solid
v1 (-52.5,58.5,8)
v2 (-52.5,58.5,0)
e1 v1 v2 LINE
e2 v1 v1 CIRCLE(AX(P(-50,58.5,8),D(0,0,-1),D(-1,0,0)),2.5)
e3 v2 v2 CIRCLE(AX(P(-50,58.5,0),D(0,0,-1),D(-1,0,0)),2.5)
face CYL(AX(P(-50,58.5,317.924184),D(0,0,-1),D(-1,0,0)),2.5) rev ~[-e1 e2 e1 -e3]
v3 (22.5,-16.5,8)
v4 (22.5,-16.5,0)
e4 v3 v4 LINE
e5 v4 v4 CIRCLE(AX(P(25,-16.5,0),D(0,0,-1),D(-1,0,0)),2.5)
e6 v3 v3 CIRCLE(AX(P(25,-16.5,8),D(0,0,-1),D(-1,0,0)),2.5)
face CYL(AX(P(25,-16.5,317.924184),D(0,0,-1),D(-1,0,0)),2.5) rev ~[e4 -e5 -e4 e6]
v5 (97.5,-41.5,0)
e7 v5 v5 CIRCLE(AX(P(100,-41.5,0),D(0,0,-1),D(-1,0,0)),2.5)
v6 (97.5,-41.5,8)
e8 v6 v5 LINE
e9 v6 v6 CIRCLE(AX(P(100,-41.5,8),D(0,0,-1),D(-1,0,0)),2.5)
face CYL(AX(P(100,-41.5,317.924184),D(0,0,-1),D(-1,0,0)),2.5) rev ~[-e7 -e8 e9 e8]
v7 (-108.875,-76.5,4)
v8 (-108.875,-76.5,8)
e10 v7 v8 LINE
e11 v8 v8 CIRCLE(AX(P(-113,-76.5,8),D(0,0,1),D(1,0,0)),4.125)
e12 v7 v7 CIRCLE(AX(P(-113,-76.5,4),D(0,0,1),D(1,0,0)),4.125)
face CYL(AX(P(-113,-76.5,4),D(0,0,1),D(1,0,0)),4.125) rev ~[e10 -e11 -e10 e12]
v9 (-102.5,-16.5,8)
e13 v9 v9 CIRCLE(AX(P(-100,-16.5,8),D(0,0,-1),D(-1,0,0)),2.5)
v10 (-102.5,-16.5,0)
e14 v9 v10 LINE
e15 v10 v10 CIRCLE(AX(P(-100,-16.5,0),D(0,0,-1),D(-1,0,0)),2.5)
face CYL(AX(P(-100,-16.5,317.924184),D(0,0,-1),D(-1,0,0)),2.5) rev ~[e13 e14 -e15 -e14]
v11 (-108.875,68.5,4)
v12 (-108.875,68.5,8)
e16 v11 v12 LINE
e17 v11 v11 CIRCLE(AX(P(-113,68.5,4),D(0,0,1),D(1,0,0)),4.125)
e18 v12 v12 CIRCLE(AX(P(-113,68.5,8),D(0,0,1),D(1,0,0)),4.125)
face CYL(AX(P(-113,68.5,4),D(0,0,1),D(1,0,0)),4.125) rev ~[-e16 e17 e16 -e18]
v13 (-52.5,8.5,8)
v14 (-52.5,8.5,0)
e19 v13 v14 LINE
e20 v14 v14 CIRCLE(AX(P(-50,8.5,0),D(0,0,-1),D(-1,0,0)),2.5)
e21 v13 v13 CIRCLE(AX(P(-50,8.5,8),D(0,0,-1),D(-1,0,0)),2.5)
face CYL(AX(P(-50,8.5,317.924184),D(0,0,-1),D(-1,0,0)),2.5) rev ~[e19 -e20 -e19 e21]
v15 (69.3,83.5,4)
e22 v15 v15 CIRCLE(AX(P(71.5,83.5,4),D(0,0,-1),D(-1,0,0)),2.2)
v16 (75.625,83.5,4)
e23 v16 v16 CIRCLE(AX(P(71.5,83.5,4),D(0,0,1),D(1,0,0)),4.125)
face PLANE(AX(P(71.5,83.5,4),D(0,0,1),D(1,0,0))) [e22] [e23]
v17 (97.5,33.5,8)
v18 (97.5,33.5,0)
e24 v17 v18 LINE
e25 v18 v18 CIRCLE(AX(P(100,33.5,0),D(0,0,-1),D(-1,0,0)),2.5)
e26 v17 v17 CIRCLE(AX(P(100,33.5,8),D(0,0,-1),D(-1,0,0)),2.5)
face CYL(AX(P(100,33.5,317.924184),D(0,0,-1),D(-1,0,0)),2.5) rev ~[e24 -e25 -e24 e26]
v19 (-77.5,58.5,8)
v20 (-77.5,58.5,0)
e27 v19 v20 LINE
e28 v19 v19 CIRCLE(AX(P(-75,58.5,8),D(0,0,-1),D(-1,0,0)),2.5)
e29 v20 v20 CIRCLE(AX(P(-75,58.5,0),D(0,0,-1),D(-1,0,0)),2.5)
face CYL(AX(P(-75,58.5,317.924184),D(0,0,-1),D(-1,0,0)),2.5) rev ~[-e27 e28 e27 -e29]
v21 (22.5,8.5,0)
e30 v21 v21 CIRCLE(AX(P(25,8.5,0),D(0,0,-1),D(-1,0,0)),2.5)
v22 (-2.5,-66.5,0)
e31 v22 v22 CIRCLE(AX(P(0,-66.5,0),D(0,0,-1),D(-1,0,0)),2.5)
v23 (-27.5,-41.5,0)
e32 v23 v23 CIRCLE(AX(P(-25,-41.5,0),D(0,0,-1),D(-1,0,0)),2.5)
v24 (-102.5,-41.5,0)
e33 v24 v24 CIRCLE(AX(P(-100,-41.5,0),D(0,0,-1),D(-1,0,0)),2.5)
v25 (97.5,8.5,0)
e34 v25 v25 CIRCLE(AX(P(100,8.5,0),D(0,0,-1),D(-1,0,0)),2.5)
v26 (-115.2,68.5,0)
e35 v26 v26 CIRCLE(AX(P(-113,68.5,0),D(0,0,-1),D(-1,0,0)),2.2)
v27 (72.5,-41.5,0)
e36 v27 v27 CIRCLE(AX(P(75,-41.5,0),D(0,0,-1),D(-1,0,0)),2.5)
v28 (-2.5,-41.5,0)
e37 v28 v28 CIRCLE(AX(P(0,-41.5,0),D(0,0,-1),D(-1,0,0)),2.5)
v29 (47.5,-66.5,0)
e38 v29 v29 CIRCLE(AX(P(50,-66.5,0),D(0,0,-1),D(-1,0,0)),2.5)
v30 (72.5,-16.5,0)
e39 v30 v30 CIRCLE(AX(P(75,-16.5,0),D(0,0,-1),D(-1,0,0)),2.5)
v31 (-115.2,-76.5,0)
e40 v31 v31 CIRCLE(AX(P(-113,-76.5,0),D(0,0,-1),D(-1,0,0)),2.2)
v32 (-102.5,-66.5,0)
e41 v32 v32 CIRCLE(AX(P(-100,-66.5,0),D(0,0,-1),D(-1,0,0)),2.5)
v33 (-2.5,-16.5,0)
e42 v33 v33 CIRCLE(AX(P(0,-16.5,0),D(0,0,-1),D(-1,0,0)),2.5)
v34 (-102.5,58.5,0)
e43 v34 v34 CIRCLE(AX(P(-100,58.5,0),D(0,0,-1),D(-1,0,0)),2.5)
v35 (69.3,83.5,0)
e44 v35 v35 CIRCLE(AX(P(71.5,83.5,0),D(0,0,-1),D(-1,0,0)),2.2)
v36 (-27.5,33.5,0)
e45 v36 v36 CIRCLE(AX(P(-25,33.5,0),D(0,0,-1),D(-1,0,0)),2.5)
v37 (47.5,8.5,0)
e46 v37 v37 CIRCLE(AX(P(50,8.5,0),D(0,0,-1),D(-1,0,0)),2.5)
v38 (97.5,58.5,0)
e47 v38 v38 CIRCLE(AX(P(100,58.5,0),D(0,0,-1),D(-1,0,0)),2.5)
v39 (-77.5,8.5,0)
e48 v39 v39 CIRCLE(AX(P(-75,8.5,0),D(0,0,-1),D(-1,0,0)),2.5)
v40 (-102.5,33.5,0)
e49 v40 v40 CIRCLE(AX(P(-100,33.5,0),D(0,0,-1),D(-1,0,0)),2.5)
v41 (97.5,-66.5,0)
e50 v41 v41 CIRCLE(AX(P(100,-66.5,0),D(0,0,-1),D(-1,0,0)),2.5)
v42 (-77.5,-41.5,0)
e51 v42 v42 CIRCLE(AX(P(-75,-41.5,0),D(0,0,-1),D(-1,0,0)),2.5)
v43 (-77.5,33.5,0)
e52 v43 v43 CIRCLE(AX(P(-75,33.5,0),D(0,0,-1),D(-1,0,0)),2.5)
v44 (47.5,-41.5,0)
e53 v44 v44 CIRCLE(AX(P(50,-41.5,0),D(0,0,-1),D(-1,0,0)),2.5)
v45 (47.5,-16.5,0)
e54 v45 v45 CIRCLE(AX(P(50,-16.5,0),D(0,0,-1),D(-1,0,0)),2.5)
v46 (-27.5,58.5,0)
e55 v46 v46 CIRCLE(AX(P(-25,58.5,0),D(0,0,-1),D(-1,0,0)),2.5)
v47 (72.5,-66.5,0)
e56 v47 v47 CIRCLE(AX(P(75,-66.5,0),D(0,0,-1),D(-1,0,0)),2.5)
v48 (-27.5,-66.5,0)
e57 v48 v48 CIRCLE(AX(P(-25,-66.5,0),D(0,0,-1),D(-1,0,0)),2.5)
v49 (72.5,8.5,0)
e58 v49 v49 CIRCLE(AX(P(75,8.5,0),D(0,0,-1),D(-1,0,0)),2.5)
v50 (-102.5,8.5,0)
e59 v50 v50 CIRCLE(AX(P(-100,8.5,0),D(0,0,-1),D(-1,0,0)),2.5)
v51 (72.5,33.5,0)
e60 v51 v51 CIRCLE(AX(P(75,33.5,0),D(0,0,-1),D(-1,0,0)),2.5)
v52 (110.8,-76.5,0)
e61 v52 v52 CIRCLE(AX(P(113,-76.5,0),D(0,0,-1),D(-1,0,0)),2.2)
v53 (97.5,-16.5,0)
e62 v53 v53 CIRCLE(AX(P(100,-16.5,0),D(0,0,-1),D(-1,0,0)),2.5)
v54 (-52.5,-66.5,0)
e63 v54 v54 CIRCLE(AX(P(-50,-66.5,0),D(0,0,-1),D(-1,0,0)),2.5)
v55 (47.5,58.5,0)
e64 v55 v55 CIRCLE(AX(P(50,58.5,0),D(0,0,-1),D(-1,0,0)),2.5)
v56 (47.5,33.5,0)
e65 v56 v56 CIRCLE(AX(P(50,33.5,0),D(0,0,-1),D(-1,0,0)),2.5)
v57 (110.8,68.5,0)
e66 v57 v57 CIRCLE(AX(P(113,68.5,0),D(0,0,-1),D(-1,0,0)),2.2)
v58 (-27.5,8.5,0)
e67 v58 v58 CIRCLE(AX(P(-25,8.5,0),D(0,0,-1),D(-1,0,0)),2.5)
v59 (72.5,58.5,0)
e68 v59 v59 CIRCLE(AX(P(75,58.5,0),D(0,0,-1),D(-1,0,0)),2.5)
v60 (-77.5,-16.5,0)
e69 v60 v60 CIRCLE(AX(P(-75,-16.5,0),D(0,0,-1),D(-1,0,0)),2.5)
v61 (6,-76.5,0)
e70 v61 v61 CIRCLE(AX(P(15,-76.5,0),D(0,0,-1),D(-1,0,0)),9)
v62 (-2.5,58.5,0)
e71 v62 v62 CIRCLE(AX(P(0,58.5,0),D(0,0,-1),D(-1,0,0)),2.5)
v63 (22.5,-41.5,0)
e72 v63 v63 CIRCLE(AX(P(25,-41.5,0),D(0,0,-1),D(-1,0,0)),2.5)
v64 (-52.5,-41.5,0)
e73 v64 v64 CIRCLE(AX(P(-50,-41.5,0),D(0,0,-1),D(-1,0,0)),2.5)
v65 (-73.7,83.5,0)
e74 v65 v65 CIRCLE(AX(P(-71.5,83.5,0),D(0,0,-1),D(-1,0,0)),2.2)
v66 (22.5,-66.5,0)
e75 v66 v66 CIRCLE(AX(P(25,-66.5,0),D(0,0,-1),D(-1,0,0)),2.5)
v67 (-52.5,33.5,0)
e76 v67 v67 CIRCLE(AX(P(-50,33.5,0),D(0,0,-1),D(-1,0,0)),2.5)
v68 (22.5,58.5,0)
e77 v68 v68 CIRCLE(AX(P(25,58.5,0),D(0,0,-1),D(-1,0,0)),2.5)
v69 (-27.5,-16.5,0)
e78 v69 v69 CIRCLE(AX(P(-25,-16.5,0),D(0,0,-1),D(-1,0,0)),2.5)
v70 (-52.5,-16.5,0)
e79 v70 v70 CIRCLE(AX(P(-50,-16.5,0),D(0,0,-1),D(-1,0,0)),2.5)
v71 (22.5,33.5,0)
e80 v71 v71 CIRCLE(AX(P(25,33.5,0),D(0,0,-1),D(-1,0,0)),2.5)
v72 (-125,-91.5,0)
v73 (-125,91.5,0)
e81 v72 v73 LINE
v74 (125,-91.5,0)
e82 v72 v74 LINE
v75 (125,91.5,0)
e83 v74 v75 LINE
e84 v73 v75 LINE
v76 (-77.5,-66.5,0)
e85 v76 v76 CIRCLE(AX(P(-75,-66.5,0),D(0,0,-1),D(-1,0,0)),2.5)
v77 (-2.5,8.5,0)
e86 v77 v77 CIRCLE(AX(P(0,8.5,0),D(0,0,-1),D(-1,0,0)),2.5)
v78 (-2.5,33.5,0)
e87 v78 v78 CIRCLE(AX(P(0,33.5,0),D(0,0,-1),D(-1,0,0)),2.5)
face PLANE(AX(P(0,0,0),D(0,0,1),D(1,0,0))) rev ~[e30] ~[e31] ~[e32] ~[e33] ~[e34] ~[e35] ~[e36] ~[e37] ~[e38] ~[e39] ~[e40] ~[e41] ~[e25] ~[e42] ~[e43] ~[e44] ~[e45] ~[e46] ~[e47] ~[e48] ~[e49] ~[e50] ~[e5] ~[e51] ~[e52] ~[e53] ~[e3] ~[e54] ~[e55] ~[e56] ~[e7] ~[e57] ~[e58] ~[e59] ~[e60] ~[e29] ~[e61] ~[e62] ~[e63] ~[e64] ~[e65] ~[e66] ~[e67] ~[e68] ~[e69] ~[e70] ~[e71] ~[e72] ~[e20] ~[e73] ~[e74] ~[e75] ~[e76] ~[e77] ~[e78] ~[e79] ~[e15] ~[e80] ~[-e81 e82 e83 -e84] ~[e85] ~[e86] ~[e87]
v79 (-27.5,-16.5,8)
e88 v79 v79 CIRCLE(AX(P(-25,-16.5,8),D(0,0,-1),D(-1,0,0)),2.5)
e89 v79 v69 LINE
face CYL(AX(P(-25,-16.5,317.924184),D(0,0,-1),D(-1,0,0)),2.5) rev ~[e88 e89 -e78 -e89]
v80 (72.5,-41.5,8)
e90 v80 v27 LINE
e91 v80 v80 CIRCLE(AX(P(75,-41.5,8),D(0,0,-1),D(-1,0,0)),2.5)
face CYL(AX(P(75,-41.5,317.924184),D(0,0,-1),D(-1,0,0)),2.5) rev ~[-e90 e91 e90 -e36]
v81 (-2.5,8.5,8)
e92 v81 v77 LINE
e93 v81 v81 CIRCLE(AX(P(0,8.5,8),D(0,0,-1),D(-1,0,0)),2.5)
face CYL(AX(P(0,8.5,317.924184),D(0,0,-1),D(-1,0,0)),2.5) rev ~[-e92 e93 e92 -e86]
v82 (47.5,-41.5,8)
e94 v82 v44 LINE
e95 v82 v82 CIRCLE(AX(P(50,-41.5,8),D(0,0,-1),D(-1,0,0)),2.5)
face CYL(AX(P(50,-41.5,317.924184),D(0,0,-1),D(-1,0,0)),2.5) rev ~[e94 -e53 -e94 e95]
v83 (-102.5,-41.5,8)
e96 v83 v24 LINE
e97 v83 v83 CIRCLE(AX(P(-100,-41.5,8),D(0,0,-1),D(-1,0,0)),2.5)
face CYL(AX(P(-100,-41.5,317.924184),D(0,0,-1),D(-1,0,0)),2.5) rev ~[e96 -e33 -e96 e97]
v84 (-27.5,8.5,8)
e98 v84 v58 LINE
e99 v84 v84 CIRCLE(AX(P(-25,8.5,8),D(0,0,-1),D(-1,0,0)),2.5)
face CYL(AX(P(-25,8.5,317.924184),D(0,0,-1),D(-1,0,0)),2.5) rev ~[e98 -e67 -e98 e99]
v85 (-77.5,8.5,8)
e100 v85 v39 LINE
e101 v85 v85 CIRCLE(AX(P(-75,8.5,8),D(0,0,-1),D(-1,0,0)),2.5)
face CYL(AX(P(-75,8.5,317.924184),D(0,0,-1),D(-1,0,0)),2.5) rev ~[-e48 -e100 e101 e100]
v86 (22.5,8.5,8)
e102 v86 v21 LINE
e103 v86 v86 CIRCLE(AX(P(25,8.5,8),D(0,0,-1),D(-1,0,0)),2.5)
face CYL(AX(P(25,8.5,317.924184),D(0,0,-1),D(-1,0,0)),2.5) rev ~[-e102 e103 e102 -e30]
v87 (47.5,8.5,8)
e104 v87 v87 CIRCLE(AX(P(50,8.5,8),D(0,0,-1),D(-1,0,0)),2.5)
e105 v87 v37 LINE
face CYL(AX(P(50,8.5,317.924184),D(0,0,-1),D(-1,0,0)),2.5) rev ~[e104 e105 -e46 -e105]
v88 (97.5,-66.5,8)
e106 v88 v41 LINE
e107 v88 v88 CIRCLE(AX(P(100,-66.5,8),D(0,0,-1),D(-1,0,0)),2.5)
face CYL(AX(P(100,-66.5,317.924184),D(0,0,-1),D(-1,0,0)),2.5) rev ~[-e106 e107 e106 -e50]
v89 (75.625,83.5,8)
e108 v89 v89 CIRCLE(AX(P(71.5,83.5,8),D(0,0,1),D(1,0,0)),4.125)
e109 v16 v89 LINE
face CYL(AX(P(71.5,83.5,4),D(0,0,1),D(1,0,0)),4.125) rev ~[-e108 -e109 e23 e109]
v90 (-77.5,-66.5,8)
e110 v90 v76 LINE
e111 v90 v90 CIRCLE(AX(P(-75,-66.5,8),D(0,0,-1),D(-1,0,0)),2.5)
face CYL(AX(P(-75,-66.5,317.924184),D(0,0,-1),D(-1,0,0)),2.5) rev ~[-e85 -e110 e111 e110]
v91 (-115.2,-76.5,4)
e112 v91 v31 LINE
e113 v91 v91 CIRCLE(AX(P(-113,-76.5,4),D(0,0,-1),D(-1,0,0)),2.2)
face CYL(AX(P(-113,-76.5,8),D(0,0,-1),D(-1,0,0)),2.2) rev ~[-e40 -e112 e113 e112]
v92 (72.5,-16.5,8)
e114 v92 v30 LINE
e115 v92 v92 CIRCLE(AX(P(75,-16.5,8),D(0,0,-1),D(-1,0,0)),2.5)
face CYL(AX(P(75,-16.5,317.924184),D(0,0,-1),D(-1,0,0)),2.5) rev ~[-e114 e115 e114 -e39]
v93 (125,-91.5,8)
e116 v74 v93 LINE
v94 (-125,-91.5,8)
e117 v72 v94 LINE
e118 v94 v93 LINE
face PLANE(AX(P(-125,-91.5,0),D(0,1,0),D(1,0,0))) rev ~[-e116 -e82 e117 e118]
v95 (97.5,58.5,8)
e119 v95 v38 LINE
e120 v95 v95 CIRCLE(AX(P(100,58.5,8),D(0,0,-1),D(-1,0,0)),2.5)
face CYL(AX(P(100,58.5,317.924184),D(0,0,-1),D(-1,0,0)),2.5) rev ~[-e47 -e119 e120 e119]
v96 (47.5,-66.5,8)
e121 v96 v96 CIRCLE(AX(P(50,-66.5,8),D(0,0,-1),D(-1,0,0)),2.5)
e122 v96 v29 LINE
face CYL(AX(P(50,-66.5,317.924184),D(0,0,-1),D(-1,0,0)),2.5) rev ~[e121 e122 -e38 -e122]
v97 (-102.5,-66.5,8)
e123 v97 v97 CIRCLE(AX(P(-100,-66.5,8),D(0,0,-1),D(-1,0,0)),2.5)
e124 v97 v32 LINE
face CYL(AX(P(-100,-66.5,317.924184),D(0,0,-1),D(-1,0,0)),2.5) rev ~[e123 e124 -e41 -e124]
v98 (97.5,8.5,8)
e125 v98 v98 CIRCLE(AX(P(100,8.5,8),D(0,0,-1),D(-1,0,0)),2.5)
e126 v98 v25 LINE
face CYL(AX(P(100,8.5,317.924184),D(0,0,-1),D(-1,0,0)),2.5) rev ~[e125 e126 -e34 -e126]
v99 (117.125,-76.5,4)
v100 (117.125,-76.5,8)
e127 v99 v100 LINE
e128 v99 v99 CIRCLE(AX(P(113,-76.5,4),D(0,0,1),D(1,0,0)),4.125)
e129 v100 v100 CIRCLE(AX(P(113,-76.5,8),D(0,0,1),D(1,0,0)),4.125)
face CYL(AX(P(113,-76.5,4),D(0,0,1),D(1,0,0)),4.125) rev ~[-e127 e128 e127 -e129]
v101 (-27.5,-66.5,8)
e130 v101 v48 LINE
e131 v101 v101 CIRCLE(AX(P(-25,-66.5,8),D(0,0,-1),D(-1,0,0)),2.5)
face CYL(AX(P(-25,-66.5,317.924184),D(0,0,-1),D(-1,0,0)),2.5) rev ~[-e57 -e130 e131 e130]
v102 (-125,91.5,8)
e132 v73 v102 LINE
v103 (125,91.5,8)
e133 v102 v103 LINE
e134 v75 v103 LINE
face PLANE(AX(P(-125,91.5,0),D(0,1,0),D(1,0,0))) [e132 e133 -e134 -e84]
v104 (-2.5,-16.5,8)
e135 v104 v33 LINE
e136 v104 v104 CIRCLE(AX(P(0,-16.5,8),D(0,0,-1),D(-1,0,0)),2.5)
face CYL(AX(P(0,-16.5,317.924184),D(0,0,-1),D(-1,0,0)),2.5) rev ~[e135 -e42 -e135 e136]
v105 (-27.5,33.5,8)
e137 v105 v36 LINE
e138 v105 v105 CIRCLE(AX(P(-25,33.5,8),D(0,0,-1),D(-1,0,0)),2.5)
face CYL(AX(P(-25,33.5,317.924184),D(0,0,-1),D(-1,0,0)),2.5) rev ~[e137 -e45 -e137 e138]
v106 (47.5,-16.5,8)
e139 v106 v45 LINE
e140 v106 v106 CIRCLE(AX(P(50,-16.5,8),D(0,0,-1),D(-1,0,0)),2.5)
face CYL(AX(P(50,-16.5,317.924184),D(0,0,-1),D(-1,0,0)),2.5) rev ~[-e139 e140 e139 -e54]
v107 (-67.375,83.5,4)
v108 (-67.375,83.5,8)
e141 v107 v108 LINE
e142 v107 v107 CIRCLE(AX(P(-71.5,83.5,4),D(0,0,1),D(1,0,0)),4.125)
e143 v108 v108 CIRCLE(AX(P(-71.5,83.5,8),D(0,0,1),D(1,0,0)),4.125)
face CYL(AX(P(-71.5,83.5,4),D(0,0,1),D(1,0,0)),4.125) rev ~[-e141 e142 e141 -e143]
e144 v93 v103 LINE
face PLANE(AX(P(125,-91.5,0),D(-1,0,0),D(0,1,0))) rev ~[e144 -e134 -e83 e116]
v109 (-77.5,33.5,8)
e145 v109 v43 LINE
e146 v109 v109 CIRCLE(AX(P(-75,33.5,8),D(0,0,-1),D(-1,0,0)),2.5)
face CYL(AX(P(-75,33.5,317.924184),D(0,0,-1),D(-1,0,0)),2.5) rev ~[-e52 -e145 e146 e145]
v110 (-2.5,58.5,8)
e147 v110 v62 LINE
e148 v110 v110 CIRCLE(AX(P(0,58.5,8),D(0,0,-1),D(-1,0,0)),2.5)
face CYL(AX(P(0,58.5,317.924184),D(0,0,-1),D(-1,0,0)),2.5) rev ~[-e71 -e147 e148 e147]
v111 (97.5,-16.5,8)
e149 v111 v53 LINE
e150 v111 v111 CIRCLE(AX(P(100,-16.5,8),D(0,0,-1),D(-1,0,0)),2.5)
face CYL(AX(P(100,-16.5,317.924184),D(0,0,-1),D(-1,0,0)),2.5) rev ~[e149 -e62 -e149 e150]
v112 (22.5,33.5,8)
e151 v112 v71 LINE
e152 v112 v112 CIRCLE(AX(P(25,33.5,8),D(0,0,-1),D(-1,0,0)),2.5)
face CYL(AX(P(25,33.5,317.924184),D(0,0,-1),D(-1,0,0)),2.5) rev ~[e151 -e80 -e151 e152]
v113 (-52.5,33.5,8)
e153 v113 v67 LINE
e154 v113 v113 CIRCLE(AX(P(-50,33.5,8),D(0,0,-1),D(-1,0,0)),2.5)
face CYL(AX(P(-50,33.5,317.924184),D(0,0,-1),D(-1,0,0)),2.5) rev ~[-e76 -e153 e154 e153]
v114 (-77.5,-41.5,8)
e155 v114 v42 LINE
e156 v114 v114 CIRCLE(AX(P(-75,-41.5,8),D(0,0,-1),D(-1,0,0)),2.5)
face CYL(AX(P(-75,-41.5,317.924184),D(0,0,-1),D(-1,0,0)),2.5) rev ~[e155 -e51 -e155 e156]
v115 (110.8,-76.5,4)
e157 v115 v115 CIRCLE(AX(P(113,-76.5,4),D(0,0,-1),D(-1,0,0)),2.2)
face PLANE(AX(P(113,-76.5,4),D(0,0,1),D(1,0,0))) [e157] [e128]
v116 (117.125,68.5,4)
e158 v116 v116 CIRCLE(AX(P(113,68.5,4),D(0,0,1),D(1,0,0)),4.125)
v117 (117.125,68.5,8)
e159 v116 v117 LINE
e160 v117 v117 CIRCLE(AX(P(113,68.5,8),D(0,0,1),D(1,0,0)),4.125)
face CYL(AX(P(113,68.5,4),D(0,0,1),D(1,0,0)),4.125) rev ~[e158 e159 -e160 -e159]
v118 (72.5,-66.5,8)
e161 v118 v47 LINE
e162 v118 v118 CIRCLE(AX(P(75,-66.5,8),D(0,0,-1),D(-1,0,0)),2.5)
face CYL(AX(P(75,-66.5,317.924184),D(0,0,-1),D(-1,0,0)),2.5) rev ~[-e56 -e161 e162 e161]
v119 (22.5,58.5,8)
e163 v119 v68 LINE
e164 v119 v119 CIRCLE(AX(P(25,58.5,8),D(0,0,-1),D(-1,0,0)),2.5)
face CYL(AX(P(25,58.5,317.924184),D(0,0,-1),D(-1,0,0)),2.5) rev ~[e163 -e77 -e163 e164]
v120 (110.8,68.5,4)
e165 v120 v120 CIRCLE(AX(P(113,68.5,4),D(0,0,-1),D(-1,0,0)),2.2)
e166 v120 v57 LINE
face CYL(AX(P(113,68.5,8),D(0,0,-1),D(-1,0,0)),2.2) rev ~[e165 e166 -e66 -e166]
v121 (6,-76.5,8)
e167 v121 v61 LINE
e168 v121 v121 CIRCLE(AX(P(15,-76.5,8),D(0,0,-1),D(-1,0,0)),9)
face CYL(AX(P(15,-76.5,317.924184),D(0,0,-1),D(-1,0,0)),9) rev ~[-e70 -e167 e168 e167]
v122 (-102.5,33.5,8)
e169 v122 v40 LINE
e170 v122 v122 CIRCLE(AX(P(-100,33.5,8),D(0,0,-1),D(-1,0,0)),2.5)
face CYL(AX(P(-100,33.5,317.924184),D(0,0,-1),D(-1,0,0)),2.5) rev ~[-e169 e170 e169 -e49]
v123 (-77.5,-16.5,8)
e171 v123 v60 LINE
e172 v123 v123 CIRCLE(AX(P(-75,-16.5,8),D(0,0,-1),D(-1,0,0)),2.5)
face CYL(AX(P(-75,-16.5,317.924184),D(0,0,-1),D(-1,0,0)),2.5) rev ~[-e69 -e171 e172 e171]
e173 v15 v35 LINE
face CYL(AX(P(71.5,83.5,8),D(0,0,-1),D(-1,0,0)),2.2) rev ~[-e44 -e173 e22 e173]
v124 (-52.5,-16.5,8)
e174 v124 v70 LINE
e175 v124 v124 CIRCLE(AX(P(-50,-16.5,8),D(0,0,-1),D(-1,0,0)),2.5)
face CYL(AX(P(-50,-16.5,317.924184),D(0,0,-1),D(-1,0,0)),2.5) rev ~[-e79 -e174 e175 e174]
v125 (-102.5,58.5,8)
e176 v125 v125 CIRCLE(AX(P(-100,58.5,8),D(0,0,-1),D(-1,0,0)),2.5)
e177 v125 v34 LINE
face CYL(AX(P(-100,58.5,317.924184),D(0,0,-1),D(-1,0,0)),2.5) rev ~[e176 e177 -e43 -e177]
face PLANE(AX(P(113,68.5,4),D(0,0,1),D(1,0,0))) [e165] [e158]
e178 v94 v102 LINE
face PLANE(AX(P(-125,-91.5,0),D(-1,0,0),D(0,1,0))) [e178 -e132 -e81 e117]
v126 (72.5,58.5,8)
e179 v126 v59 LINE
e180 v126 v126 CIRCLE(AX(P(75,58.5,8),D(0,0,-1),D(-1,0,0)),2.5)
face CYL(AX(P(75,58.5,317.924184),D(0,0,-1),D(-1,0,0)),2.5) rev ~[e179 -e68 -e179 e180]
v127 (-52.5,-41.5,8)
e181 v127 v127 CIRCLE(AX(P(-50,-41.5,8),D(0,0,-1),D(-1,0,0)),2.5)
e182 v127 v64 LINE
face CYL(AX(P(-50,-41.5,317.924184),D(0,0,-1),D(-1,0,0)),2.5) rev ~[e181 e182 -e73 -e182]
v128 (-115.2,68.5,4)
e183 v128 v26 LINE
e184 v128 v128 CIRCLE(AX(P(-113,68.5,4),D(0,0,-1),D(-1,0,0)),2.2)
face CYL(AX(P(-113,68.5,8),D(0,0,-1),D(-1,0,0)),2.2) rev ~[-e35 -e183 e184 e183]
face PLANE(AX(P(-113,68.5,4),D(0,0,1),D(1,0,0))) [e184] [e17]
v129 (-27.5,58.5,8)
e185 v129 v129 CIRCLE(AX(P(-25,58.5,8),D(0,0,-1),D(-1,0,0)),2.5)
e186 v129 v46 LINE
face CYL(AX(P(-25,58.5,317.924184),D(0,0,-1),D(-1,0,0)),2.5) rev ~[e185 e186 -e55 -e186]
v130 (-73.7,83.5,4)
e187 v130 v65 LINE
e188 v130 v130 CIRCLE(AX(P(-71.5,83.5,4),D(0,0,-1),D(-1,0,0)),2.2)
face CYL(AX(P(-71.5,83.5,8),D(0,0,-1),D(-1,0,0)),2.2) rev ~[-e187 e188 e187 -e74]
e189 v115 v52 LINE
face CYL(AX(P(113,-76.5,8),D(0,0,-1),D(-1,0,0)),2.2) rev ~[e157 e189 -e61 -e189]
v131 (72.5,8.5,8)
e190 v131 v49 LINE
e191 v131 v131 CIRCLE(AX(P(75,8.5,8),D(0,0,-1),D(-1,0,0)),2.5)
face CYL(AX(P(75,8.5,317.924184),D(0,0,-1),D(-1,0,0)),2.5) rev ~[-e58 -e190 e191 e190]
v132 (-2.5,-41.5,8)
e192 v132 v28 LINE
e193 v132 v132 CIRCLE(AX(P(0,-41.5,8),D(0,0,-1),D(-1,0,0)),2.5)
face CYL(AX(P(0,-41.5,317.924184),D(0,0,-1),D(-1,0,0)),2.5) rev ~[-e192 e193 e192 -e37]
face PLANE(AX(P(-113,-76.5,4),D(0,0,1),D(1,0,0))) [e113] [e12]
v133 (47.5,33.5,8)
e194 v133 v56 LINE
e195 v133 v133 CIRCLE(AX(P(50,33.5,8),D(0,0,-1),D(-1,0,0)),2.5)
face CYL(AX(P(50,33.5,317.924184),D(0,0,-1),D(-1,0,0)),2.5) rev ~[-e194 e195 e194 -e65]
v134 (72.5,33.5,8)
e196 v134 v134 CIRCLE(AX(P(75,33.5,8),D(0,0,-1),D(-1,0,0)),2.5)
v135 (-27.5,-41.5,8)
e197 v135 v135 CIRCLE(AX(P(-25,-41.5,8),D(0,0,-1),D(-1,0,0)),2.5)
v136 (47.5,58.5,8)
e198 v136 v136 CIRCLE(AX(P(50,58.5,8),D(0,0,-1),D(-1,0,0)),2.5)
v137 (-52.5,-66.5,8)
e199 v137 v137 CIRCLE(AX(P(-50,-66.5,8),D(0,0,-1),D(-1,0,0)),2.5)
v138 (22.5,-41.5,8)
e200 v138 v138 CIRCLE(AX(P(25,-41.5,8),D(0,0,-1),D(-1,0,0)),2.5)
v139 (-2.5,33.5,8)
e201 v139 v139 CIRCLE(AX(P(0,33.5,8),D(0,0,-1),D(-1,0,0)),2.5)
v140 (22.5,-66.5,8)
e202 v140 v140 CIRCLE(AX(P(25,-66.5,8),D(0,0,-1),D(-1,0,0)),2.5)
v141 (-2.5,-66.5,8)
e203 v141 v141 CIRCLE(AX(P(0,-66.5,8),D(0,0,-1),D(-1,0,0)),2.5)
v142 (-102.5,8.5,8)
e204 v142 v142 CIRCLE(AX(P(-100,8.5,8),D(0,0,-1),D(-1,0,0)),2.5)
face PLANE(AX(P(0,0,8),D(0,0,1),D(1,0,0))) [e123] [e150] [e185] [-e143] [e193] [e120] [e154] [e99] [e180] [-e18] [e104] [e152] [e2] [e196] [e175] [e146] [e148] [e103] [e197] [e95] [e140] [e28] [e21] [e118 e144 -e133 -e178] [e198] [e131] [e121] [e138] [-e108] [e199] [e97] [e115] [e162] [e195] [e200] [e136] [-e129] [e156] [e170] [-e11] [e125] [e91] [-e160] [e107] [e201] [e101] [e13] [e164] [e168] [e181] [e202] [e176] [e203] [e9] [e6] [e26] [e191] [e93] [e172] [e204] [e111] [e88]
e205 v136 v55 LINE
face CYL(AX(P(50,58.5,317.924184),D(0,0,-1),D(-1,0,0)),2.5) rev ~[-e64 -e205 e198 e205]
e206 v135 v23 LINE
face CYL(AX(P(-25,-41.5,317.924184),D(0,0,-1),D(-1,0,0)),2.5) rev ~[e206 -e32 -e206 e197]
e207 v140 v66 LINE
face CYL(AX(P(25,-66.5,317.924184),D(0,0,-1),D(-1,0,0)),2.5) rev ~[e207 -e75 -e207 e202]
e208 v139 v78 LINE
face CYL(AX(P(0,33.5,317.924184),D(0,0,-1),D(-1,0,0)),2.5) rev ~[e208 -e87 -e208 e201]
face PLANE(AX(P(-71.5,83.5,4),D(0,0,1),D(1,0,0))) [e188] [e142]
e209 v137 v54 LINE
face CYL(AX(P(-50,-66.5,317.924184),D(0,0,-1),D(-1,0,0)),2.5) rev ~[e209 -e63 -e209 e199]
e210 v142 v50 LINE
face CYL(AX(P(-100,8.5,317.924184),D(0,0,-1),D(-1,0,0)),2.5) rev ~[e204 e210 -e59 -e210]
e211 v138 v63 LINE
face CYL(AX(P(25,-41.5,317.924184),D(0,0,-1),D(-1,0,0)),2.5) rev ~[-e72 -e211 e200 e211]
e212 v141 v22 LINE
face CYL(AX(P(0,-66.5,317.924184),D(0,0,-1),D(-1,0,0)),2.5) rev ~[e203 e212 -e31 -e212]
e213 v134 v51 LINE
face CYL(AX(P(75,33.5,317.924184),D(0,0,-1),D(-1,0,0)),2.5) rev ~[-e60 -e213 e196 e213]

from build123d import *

# Parameters (mm, degrees)
F0_W           = 250
F0_H           = 183
F1_DEPTH       = 8
F3_D           = 4.4
F3_CBORE_D     = 8.25
F3_CBORE_DEPTH = 4
F4_D           = 18
F5_D           = 5


# Not quite as in the source:
# - a feature names something its author has since deleted; it is built from what else it names


with BuildPart() as f1:
    # F0 (on Top) → F1 (new body)
    with BuildSketch(Plane.XY):
        Rectangle(F0_W, F0_H)
    extrude(amount=F1_DEPTH)

    # F3 (through all)
    with Locations(Plane.XY.offset(8)):
        with Locations((-113, 68.5), (-113, -76.5), (113, -76.5), (113, 68.5), (71.5, 83.5), (-71.5, 83.5)):
            CounterBoreHole(F3_D / 2, F3_CBORE_D / 2, F3_CBORE_DEPTH)

    # F4 (through all)
    with Locations(Plane.XY.offset(8)):
        with Locations((15, -76.5)):
            Hole(F4_D / 2)

    # F5 (through all)
    with Locations(Plane.XY.offset(8)):
        with Locations((100, 58.5), (100, 33.5), (100, 8.5), (100, -16.5), (100, -41.5), (100, -66.5), (75, -66.5), (75, -41.5), (75, -16.5), (75, 8.5), (75, 33.5), (75, 58.5), (50, 58.5), (50, 33.5), (50, 8.5), (50, -16.5), (50, -41.5), (50, -66.5), (25, -66.5), (0, -66.5), (-25, -66.5), (-50, -66.5), (-75, -66.5), (-100, -66.5), (-100, -41.5), (-75, -41.5), (-50, -41.5), (-25, -41.5), (0, -41.5), (25, -41.5), (25, -16.5), (0, -16.5), (-25, -16.5), (-50, -16.5), (-75, -16.5), (-100, -16.5), (-100, 8.5), (-75, 8.5), (-50, 8.5), (-25, 8.5), (0, 8.5), (25, 8.5), (25, 33.5), (0, 33.5), (-25, 33.5), (-50, 33.5), (-75, 33.5), (-100, 33.5), (-100, 58.5), (-75, 58.5), (-50, 58.5), (25, 58.5), (-25, 58.5), (0, 58.5)):
            Hole(F5_D / 2)


solid = f1.part
